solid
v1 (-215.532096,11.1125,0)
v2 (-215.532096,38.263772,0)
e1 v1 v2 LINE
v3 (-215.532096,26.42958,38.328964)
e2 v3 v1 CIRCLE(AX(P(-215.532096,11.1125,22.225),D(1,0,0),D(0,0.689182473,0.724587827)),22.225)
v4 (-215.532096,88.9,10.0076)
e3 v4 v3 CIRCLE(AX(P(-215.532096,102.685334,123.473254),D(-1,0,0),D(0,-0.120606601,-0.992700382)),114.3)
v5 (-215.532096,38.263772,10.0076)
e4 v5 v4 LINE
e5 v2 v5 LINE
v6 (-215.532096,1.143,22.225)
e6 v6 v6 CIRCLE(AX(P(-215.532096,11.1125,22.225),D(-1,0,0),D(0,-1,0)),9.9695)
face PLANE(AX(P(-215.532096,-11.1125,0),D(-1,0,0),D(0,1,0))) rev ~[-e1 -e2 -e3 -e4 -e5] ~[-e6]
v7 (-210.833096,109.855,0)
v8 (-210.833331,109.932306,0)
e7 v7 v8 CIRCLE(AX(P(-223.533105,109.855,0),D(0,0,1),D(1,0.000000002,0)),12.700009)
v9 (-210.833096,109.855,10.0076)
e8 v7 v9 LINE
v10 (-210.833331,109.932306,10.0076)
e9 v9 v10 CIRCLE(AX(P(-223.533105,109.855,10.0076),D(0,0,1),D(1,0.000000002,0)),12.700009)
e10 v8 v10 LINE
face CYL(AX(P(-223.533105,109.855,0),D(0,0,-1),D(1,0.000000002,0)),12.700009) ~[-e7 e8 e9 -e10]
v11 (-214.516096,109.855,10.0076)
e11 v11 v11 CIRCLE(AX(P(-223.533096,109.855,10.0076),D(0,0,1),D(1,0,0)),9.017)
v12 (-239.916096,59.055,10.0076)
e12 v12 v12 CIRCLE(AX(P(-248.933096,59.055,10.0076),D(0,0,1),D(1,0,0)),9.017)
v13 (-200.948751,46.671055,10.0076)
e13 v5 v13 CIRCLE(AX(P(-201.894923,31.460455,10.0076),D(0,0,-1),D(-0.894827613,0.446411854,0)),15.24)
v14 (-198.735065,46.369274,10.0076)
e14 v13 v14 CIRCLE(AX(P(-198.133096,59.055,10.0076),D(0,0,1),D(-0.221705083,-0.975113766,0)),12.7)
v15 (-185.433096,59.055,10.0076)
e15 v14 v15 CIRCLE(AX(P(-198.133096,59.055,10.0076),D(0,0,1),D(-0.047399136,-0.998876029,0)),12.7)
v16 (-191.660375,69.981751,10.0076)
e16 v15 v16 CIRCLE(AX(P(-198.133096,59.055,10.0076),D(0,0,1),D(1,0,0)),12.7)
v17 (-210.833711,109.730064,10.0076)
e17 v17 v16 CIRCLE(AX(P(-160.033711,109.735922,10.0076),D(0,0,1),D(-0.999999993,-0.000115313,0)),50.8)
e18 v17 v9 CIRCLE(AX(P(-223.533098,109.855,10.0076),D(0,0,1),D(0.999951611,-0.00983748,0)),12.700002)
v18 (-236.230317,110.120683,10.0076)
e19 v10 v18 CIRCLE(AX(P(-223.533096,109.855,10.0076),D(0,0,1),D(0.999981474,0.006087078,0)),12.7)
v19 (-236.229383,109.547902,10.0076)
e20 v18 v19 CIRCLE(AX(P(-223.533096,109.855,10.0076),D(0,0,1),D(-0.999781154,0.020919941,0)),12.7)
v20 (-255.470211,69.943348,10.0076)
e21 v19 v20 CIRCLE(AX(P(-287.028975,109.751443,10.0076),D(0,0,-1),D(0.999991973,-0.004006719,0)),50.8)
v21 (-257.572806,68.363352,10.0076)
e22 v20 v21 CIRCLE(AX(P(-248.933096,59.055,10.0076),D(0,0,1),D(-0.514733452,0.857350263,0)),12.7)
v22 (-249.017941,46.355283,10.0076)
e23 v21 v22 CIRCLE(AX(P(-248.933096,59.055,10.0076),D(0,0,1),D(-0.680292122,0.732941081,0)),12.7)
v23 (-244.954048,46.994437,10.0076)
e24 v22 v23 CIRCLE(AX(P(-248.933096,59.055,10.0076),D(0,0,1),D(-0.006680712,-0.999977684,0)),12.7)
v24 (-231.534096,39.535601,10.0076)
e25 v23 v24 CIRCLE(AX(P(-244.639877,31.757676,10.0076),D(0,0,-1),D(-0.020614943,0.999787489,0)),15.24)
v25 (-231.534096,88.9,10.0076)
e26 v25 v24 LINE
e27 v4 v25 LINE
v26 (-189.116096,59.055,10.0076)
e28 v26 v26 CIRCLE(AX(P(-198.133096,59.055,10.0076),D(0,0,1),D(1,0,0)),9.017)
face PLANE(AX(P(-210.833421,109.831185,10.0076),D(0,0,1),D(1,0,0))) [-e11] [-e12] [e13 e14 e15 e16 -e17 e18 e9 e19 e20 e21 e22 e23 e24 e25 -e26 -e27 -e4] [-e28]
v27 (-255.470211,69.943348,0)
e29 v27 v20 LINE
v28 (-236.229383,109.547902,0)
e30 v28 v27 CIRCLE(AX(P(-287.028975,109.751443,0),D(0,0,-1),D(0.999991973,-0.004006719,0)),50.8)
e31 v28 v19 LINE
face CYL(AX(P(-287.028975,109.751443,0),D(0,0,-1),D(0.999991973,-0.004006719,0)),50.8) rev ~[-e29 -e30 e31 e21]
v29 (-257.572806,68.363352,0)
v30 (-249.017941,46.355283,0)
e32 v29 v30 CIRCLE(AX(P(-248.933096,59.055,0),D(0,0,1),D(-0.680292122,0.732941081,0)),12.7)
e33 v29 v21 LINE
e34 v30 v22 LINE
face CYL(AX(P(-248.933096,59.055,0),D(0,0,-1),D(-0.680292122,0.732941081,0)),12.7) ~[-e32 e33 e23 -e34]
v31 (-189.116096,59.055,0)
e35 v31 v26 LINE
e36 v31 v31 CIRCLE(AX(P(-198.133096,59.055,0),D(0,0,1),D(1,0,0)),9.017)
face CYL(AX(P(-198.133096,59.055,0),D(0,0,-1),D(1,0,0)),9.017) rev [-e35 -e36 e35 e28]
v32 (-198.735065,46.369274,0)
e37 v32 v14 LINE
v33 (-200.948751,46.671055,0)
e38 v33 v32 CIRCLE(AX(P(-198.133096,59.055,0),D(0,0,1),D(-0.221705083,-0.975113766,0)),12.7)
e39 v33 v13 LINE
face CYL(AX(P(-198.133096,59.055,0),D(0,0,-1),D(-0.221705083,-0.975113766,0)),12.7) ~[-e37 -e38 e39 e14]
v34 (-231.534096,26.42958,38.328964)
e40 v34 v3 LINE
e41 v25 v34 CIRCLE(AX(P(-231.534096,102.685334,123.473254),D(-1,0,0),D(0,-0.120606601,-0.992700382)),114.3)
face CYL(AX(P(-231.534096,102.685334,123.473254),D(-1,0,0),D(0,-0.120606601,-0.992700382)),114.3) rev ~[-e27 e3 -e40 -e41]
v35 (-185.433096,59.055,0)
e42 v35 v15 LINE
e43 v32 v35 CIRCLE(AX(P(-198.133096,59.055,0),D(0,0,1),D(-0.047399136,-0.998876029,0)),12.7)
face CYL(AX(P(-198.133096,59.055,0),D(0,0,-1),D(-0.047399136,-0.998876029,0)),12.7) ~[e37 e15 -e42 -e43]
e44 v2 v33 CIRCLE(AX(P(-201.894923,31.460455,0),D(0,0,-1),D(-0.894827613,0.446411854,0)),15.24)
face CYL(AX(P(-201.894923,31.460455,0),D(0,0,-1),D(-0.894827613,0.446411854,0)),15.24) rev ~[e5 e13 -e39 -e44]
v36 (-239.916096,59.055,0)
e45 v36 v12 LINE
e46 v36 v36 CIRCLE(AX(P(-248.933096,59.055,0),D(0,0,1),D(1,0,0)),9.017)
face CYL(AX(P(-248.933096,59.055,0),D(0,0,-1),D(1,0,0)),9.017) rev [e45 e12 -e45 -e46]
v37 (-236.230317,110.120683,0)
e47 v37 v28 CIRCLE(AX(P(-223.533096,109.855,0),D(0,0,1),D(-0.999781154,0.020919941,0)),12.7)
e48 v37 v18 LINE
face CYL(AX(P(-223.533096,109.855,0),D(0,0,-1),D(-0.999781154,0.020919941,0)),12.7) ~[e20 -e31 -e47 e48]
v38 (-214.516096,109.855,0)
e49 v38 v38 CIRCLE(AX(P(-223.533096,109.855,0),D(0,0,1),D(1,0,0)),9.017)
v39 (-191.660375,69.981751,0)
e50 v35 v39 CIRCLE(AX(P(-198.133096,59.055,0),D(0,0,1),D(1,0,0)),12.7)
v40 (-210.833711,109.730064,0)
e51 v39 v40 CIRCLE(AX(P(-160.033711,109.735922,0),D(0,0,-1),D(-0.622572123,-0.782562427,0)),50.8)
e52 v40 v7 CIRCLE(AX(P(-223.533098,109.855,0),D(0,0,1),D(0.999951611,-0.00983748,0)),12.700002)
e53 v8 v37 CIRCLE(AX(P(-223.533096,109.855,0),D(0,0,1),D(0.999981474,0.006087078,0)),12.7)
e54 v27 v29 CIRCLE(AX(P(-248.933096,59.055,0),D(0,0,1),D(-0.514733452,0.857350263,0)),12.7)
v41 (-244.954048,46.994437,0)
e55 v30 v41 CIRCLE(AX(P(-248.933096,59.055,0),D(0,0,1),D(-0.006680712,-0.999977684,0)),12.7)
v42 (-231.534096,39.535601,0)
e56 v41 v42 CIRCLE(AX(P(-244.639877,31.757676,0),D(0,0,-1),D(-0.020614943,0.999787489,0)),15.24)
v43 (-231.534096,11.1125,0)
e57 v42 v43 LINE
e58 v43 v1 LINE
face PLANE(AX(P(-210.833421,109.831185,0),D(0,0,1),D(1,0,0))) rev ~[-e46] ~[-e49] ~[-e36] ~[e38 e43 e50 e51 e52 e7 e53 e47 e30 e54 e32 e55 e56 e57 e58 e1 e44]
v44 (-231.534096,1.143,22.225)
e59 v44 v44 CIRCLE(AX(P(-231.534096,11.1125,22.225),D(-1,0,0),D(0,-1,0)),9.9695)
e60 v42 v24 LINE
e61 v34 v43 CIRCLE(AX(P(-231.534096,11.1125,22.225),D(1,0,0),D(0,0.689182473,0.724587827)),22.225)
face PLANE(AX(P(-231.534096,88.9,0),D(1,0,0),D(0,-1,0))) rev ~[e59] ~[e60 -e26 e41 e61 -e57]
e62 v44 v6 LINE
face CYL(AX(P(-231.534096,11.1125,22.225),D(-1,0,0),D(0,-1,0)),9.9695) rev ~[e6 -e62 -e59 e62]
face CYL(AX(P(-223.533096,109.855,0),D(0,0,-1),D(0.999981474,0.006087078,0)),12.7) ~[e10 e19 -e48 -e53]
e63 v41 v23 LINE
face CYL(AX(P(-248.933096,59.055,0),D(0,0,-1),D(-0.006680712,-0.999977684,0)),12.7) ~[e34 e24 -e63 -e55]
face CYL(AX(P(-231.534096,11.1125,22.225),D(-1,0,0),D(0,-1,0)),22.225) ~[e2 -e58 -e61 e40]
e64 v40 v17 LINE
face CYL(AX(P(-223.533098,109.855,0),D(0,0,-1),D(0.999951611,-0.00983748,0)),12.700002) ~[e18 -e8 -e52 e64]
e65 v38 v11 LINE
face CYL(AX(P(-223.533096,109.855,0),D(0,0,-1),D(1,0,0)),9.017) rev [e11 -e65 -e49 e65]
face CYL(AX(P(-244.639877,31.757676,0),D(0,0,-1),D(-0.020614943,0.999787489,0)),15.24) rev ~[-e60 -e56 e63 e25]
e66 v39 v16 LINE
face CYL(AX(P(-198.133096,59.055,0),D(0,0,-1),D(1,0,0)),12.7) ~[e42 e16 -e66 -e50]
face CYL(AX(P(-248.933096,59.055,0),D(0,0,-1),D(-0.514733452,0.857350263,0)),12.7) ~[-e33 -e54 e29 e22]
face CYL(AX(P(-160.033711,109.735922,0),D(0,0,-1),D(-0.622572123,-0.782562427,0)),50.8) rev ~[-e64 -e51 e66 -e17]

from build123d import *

# Parameters (mm, degrees)
F0_W     = 16.002
F0_H     = 11.1125
F1_DEPTH = 76.2
F0_R     = 9.017
F2_DEPTH = 10.0076
F3_R     = 9.9695
F4_DEPTH = 25.4


# Not quite as in the source:
# - a feature names something its author has since deleted; it is built from what else it names


with BuildPart() as f1:
    # F0 (on Top) → F1 (new body)
    with BuildSketch(Plane.XY):
        Polygon((-215.5320961376, 0), (-215.5320961376, 38.263771664), (-215.5320961376, 88.9), (-231.5340961376, 88.9), (-231.5340961376, 39.535600692), (-231.5340961376, 0), align=None)
        with Locations((-223.5330961376, -5.55625)):
            Rectangle(F0_W, F0_H)
    extrude(amount=F1_DEPTH)

    # F0 (on Top) → F2 (join)
    with BuildSketch(Plane.XY):
        with BuildLine():
            ThreePointArc((-210.8337106802, 109.7300639993), (-210.8332497742, 109.7925312439), (-210.8330961376, 109.855))
            ThreePointArc((-210.8330961376, 109.855), (-210.8331549592, 109.8936531274), (-210.8333314233, 109.9323058968))
            ThreePointArc((-210.8333314233, 109.9323058968), (-210.8336216962, 109.8311851368), (-210.8337106802, 109.7300639993))
        make_face()
        with BuildLine():
            ThreePointArc((-210.8337106802, 109.7300639993), (-210.8336216962, 109.8311851368), (-210.8333314233, 109.9323058968))
            ThreePointArc((-210.8333314233, 109.9323058968), (-223.438898877, 122.5546506596), (-236.2303167947, 110.12068324))
            ThreePointArc((-236.2303167947, 110.12068324), (-236.2290424274, 109.8342939205), (-236.229382634, 109.5479019679))
            ThreePointArc((-236.229382634, 109.5479019679), (-223.4420019429, 97.1553267031), (-210.8337106802, 109.7300639993))
        make_face()
        with Locations((-223.5330961376, 109.855)):
            Circle(F0_R, mode=Mode.SUBTRACT)
        with BuildLine():
            ThreePointArc((-191.660374853, 69.9817506227), (-205.7887196825, 87.6651452552), (-210.8337106802, 109.7300639993))
            ThreePointArc((-210.8337106802, 109.7300639993), (-223.4420019429, 97.1553267031), (-236.229382634, 109.5479019679))
            ThreePointArc((-236.229382634, 109.5479019679), (-241.3359242696, 87.5526791762), (-255.4702109751, 69.9433483413))
            ThreePointArc((-255.4702109751, 69.9433483413), (-242.6773531137, 70.1074060375), (-236.2330961376, 59.055))
            ThreePointArc((-236.2330961376, 59.055), (-238.6417428115, 51.6133572568), (-244.9540483765, 46.9944370399))
            ThreePointArc((-244.9540483765, 46.9944370399), (-237.2361698926, 45.078438676), (-231.5340961376, 39.535600692))
            Line((-231.5340961376, 39.535600692), (-231.5340961376, 88.9))
            Line((-231.5340961376, 88.9), (-215.5320961376, 88.9))
            Line((-215.5320961376, 88.9), (-215.5320961376, 38.263771664))
            ThreePointArc((-215.5320961376, 38.263771664), (-209.5064918471, 44.6635464864), (-200.94875069, 46.6710551745))
            ThreePointArc((-200.94875069, 46.6710551745), (-209.9310054796, 63.7559929971), (-191.660374853, 69.9817506227))
        make_face()
        with BuildLine():
            ThreePointArc((-236.229382634, 109.5479019679), (-236.2290424274, 109.8342939205), (-236.2303167947, 110.12068324))
            ThreePointArc((-236.2303167947, 110.12068324), (-236.2330792473, 109.8342873368), (-236.229382634, 109.5479019679))
        make_face()
        with BuildLine():
            ThreePointArc((-185.4330961376, 59.055), (-187.0992037982, 65.343339991), (-191.660374853, 69.9817506227))
            ThreePointArc((-191.660374853, 69.9817506227), (-209.9310054796, 63.7559929971), (-200.94875069, 46.6710551745))
            ThreePointArc((-200.94875069, 46.6710551745), (-199.8363704021, 46.5607848043), (-198.7350651606, 46.3692744277))
            ThreePointArc((-198.7350651606, 46.3692744277), (-189.3682517748, 49.8643796022), (-185.4330961376, 59.055))
        make_face()
        with Locations((-198.1330961376, 59.055)):
            Circle(F0_R, mode=Mode.SUBTRACT)
        with BuildLine():
            ThreePointArc((-257.5728060865, 68.3633517337), (-256.5112816453, 69.1397405149), (-255.4702109751, 69.9433483413))
            ThreePointArc((-255.4702109751, 69.9433483413), (-256.5625194428, 69.2079256882), (-257.5728060865, 68.3633517337))
        make_face()
        with BuildLine():
            ThreePointArc((-236.2330961376, 59.055), (-242.6773531137, 70.1074060375), (-255.4702109751, 69.9433483413))
            ThreePointArc((-255.4702109751, 69.9433483413), (-256.5112816453, 69.1397405149), (-257.5728060865, 68.3633517337))
            ThreePointArc((-257.5728060865, 68.3633517337), (-260.7702508926, 54.4537211227), (-249.0179411736, 46.3552834158))
            ThreePointArc((-249.0179411736, 46.3552834158), (-247.0076603385, 46.8126151022), (-244.9540483765, 46.9944370399))
            ThreePointArc((-244.9540483765, 46.9944370399), (-238.6417428115, 51.6133572568), (-236.2330961376, 59.055))
        make_face()
        with Locations((-248.9330961376, 59.055)):
            Circle(F0_R, mode=Mode.SUBTRACT)
        with BuildLine():
            ThreePointArc((-198.7350651606, 46.3692744277), (-199.8363704021, 46.5607848043), (-200.94875069, 46.6710551745))
            ThreePointArc((-200.94875069, 46.6710551745), (-199.8485569009, 46.4713918382), (-198.7350651606, 46.3692744277))
        make_face()
        Polygon((-215.5320961376, 0), (-215.5320961376, 38.263771664), (-215.5320961376, 88.9), (-231.5340961376, 88.9), (-231.5340961376, 39.535600692), (-231.5340961376, 0), align=None)
        with BuildLine():
            ThreePointArc((-249.0179411736, 46.3552834158), (-246.9599430632, 46.5092171649), (-244.9540483765, 46.9944370399))
            ThreePointArc((-244.9540483765, 46.9944370399), (-247.0076603385, 46.8126151022), (-249.0179411736, 46.3552834158))
        make_face()
        with Locations((-223.5330961376, -5.55625)):
            Rectangle(F0_W, F0_H)
    extrude(amount=F2_DEPTH)

    # F3 (on face) → F4 (cut)
    with BuildSketch(Plane(origin=(-231.5340961376, 0, 0), x_dir=(0, -1, 0), z_dir=(-1, 0, 0))):
        with BuildLine():
            ThreePointArc((-26.4295804615, 38.3289644541), (-2.3509786782, 42.6501406146), (11.1125, 22.225))
            Line((11.1125, 22.225), (11.1125, 76.2))
            Line((11.1125, 76.2), (-88.9, 76.2))
            Line((-88.9, 76.2), (-88.9, 10.0076))
            ThreePointArc((-88.9, 10.0076), (-55.490267729, 19.3717854622), (-26.4295804615, 38.3289644541))
        make_face()
        with Locations((-11.1125, 22.225)):
            Circle(F3_R)
        with BuildLine():
            Line((11.1125, 0), (11.1125, 22.225))
            ThreePointArc((11.1125, 22.225), (4.6029482119, 6.5095517881), (-11.1125, 0))
            Line((-11.1125, 0), (0, 0))
            Line((0, 0), (11.1125, 0))
        make_face()
    extrude(amount=-F4_DEPTH, mode=Mode.SUBTRACT)


solid = f1.part
